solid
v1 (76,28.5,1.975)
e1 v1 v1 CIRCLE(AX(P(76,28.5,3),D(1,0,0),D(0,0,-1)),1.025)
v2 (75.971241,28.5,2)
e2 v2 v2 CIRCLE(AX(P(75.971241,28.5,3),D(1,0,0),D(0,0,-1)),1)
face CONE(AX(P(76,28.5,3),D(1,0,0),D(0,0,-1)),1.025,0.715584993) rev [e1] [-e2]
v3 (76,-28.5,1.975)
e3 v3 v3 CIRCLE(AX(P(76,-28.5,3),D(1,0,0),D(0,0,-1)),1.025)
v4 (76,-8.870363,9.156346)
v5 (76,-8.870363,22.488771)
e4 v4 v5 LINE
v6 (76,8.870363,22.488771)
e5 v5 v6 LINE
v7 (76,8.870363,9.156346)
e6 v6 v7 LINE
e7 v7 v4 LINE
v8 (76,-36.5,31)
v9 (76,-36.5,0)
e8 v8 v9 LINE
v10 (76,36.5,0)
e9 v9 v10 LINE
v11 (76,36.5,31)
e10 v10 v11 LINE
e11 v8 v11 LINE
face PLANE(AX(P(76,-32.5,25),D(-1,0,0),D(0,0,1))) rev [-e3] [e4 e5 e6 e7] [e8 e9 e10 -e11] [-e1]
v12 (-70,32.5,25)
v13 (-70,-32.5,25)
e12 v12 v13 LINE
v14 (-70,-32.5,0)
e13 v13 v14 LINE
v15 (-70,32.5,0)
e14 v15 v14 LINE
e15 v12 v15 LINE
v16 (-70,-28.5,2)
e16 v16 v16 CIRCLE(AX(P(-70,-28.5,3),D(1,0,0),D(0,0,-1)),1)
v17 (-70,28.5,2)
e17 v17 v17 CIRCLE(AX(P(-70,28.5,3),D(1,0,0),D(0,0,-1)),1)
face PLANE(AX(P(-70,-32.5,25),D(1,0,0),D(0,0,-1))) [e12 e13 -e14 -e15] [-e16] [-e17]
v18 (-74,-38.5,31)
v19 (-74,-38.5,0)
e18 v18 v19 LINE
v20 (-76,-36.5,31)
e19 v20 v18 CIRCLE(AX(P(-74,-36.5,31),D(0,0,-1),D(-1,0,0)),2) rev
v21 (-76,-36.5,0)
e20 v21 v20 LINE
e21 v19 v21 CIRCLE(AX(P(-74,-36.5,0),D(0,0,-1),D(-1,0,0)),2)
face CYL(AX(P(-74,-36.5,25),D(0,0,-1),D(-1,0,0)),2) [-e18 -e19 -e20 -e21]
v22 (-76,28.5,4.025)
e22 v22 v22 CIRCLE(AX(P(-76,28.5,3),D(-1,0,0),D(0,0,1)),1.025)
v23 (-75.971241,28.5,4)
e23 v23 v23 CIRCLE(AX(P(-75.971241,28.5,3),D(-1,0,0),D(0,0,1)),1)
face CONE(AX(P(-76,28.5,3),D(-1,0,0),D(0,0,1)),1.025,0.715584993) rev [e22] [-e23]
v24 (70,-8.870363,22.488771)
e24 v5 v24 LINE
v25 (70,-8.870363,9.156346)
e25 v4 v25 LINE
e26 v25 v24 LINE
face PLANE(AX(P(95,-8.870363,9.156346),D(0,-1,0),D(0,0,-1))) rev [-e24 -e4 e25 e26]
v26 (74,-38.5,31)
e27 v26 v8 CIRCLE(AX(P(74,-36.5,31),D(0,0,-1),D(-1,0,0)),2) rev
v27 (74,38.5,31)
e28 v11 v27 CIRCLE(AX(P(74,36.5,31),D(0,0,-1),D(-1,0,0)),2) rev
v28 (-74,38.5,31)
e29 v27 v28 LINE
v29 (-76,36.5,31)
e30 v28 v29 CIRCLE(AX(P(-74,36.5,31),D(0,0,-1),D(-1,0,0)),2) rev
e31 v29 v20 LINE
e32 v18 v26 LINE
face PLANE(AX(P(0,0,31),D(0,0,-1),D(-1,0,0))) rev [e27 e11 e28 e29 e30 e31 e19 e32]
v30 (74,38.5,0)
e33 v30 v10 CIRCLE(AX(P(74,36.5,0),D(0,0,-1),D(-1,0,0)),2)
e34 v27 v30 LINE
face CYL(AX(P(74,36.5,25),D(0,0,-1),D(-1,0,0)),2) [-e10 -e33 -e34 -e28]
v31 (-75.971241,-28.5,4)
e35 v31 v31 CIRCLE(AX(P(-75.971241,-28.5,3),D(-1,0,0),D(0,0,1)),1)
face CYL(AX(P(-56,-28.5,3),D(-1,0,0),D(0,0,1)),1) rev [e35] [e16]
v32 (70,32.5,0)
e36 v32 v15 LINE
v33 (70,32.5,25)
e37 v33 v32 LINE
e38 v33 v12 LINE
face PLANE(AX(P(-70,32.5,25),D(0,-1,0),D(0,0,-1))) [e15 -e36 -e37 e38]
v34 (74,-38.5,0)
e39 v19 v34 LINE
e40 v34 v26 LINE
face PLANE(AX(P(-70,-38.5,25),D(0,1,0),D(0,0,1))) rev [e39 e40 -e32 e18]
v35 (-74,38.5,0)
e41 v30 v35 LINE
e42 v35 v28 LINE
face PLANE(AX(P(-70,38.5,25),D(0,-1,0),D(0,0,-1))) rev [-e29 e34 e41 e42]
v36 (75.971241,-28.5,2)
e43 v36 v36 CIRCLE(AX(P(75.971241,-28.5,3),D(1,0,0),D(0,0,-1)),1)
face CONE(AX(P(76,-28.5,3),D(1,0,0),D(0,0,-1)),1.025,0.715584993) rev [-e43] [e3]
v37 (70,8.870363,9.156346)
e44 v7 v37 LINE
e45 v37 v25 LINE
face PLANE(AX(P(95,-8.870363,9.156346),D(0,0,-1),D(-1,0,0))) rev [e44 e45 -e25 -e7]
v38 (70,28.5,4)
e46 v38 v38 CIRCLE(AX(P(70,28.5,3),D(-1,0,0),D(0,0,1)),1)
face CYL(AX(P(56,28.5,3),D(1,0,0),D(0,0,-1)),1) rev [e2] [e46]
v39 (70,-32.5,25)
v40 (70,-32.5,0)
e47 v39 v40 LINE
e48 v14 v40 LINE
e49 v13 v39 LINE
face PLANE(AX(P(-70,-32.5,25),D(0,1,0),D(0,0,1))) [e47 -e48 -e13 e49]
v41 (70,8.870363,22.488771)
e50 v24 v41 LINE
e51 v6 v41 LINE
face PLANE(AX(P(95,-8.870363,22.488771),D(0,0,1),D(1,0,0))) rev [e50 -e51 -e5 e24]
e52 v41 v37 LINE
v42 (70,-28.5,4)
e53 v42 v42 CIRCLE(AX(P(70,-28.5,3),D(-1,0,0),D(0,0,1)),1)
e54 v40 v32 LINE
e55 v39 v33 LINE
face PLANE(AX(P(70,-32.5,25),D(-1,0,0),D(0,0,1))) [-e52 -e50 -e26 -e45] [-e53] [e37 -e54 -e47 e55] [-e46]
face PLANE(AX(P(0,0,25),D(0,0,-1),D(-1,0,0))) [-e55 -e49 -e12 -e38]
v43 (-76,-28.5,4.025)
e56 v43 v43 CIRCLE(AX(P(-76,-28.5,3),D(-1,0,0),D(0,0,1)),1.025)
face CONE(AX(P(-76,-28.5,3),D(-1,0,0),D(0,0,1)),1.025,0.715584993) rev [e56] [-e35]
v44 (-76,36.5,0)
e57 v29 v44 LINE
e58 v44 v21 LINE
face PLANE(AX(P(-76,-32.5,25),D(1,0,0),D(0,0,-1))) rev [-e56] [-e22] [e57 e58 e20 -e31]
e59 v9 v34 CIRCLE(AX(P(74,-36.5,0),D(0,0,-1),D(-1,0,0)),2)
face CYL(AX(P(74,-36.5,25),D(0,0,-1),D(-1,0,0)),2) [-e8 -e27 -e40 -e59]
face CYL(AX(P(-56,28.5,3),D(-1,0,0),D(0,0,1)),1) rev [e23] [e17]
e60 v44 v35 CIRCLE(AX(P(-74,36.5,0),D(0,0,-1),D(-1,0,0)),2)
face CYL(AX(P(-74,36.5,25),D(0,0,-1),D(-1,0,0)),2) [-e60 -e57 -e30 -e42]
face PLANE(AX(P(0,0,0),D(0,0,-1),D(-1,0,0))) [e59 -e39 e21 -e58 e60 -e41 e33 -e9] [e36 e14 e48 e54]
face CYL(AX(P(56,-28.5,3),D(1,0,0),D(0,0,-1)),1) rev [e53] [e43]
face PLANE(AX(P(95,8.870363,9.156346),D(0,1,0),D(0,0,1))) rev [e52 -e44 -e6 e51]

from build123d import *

# Parameters (mm, degrees)
IZIM1_W                     = 140
IZIM1_H                     = 65
Y_KSEKLIK_EKSTR_ZYON1_DEPTH = 25
BO_ALTMA3_T                 = 6
IZIM2_R                     = 2.25
KES_EKSTR_ZYON1_DEPTH       = 25
IZIM3_W                     = 13.33242511
IZIM3_H                     = 17.74072696
KES_EKSTR_ZYON2_DEPTH       = 25
RADYUS1_R                   = 2
Y_KSEKLIK_EKSTR_ZYON2_START = 25
IZIM4_R                     = 2.25
Y_KSEKLIK_EKSTR_ZYON2_DEPTH = 25
IZIM5_R                     = 1
KES_EKSTR_ZYON3_DEPTH       = 20
KES_EKSTR_ZYON4_START       = -20
IZIM6_R                     = 1
KES_EKSTR_ZYON4_DEPTH       = 20


# Read off the part's stored shape, not the designer's step: M2 Dişli Delik1
with BuildPart() as part:
    # Çizim1 → Yükseklik-Ekstrüzyon1 (new body)
    with BuildSketch(Plane.XY):
        Rectangle(IZIM1_W, IZIM1_H)
    extrude(amount=Y_KSEKLIK_EKSTR_ZYON1_DEPTH)

    # İç Boşaltma3
    bo_altma3_openings = [part.faces().sort_by_distance(p)[0] for p in [
        (0, 0, 0),
    ]]
    offset(amount=BO_ALTMA3_T, openings=bo_altma3_openings, kind=Kind.INTERSECTION)

    # Çizim2 → Kes-Ekstrüzyon1 (cut)
    with BuildSketch(Plane(origin=(0, 0, 0), x_dir=(-1, 0, 0), z_dir=(0, 0, -1))):
        with Locations((-73, -35.5)):
            Circle(IZIM2_R)
        with Locations(Location((73, -35.5, 0), (0, 0, 180))):
            Circle(IZIM2_R)
        with Locations(Location((-73, 35.5, 0), (0, 0, 180))):
            Circle(IZIM2_R)
        with Locations((73, 35.5)):
            Circle(IZIM2_R)
    extrude(amount=-KES_EKSTR_ZYON1_DEPTH, mode=Mode.SUBTRACT)

    # Çizim3 → Kes-Ekstrüzyon2 (cut)
    with BuildSketch(Plane.ZY.offset(-70)):
        with Locations((15.822558672, 0)):
            Rectangle(IZIM3_W, IZIM3_H)
    extrude(amount=-KES_EKSTR_ZYON2_DEPTH, mode=Mode.SUBTRACT)

    # Radyus1
    radyus1_edges = [part.edges().sort_by_distance(p)[0] for p in [
        (76, -38.5, 15.5),
        (-76, -38.5, 15.5),
        (-76, 38.5, 15.5),
        (76, 38.5, 15.5),
    ]]
    fillet(radyus1_edges, radius=RADYUS1_R)

    # Çizim4 → Yükseklik-Ekstrüzyon2 (add)
    with BuildSketch(Plane(origin=(0, 0, 25), x_dir=(-1, 0, 0), z_dir=(0, 0, -1)).offset(Y_KSEKLIK_EKSTR_ZYON2_START)):
        with Locations((73, 35.5)):
            Circle(IZIM4_R)
        with Locations((73, -35.5)):
            Circle(IZIM4_R)
        with Locations((-73, 35.5)):
            Circle(IZIM4_R)
        with Locations((-73, -35.5)):
            Circle(IZIM4_R)
    extrude(amount=-Y_KSEKLIK_EKSTR_ZYON2_DEPTH)

    # Çizim5 → Kes-Ekstrüzyon3 (cut)
    with BuildSketch(Plane(origin=(76, 0, 0), x_dir=(0, 0, -1), z_dir=(1, 0, 0))):
        with Locations((-3, 28.5)):
            Circle(IZIM5_R)
        with Locations(Location((-3, -28.5, 0), (0, 0, 180))):
            Circle(IZIM5_R)
    extrude(amount=-KES_EKSTR_ZYON3_DEPTH, mode=Mode.SUBTRACT)

    # Çizim6 → Kes-Ekstrüzyon4 (cut)
    with BuildSketch(Plane.ZY.offset(76).offset(KES_EKSTR_ZYON4_START)):
        with Locations(Location((3, 28.5, 0), (0, 0, 180))):
            Circle(IZIM6_R)
        with Locations((3, -28.5)):
            Circle(IZIM6_R)
    extrude(amount=KES_EKSTR_ZYON4_DEPTH, mode=Mode.SUBTRACT)

    # M2 Dişli Delik1 outline → M2 Dişli Delik1 (revolve, cut)
    with BuildSketch(Plane(origin=(0, 28.5, 3), x_dir=(0, 1, 0), z_dir=(0, 0, -1))):
        Polygon((1, 76), (1, 75.97124079), (1.025, 76), align=None)
        Polygon((1.025, -76), (1, -75.97124079), (1, -76), align=None)
    revolve(axis=Axis((0, 28.5, 3), (1, 0, 0)), mode=Mode.SUBTRACT)

    # M2 Di_li Delik1 2 outline → M2 Di_li Delik1 2 (revolve, cut)
    with BuildSketch(Plane(origin=(0, -28.5, 3), x_dir=(0, 1, 0), z_dir=(0, 0, -1))):
        Polygon((1, 76), (1, 75.97124079), (1.025, 76), align=None)
        Polygon((1.025, -76), (1, -75.97124079), (1, -76), align=None)
    revolve(axis=Axis((0, -28.5, 3), (1, 0, 0)), mode=Mode.SUBTRACT)


solid = part.part
